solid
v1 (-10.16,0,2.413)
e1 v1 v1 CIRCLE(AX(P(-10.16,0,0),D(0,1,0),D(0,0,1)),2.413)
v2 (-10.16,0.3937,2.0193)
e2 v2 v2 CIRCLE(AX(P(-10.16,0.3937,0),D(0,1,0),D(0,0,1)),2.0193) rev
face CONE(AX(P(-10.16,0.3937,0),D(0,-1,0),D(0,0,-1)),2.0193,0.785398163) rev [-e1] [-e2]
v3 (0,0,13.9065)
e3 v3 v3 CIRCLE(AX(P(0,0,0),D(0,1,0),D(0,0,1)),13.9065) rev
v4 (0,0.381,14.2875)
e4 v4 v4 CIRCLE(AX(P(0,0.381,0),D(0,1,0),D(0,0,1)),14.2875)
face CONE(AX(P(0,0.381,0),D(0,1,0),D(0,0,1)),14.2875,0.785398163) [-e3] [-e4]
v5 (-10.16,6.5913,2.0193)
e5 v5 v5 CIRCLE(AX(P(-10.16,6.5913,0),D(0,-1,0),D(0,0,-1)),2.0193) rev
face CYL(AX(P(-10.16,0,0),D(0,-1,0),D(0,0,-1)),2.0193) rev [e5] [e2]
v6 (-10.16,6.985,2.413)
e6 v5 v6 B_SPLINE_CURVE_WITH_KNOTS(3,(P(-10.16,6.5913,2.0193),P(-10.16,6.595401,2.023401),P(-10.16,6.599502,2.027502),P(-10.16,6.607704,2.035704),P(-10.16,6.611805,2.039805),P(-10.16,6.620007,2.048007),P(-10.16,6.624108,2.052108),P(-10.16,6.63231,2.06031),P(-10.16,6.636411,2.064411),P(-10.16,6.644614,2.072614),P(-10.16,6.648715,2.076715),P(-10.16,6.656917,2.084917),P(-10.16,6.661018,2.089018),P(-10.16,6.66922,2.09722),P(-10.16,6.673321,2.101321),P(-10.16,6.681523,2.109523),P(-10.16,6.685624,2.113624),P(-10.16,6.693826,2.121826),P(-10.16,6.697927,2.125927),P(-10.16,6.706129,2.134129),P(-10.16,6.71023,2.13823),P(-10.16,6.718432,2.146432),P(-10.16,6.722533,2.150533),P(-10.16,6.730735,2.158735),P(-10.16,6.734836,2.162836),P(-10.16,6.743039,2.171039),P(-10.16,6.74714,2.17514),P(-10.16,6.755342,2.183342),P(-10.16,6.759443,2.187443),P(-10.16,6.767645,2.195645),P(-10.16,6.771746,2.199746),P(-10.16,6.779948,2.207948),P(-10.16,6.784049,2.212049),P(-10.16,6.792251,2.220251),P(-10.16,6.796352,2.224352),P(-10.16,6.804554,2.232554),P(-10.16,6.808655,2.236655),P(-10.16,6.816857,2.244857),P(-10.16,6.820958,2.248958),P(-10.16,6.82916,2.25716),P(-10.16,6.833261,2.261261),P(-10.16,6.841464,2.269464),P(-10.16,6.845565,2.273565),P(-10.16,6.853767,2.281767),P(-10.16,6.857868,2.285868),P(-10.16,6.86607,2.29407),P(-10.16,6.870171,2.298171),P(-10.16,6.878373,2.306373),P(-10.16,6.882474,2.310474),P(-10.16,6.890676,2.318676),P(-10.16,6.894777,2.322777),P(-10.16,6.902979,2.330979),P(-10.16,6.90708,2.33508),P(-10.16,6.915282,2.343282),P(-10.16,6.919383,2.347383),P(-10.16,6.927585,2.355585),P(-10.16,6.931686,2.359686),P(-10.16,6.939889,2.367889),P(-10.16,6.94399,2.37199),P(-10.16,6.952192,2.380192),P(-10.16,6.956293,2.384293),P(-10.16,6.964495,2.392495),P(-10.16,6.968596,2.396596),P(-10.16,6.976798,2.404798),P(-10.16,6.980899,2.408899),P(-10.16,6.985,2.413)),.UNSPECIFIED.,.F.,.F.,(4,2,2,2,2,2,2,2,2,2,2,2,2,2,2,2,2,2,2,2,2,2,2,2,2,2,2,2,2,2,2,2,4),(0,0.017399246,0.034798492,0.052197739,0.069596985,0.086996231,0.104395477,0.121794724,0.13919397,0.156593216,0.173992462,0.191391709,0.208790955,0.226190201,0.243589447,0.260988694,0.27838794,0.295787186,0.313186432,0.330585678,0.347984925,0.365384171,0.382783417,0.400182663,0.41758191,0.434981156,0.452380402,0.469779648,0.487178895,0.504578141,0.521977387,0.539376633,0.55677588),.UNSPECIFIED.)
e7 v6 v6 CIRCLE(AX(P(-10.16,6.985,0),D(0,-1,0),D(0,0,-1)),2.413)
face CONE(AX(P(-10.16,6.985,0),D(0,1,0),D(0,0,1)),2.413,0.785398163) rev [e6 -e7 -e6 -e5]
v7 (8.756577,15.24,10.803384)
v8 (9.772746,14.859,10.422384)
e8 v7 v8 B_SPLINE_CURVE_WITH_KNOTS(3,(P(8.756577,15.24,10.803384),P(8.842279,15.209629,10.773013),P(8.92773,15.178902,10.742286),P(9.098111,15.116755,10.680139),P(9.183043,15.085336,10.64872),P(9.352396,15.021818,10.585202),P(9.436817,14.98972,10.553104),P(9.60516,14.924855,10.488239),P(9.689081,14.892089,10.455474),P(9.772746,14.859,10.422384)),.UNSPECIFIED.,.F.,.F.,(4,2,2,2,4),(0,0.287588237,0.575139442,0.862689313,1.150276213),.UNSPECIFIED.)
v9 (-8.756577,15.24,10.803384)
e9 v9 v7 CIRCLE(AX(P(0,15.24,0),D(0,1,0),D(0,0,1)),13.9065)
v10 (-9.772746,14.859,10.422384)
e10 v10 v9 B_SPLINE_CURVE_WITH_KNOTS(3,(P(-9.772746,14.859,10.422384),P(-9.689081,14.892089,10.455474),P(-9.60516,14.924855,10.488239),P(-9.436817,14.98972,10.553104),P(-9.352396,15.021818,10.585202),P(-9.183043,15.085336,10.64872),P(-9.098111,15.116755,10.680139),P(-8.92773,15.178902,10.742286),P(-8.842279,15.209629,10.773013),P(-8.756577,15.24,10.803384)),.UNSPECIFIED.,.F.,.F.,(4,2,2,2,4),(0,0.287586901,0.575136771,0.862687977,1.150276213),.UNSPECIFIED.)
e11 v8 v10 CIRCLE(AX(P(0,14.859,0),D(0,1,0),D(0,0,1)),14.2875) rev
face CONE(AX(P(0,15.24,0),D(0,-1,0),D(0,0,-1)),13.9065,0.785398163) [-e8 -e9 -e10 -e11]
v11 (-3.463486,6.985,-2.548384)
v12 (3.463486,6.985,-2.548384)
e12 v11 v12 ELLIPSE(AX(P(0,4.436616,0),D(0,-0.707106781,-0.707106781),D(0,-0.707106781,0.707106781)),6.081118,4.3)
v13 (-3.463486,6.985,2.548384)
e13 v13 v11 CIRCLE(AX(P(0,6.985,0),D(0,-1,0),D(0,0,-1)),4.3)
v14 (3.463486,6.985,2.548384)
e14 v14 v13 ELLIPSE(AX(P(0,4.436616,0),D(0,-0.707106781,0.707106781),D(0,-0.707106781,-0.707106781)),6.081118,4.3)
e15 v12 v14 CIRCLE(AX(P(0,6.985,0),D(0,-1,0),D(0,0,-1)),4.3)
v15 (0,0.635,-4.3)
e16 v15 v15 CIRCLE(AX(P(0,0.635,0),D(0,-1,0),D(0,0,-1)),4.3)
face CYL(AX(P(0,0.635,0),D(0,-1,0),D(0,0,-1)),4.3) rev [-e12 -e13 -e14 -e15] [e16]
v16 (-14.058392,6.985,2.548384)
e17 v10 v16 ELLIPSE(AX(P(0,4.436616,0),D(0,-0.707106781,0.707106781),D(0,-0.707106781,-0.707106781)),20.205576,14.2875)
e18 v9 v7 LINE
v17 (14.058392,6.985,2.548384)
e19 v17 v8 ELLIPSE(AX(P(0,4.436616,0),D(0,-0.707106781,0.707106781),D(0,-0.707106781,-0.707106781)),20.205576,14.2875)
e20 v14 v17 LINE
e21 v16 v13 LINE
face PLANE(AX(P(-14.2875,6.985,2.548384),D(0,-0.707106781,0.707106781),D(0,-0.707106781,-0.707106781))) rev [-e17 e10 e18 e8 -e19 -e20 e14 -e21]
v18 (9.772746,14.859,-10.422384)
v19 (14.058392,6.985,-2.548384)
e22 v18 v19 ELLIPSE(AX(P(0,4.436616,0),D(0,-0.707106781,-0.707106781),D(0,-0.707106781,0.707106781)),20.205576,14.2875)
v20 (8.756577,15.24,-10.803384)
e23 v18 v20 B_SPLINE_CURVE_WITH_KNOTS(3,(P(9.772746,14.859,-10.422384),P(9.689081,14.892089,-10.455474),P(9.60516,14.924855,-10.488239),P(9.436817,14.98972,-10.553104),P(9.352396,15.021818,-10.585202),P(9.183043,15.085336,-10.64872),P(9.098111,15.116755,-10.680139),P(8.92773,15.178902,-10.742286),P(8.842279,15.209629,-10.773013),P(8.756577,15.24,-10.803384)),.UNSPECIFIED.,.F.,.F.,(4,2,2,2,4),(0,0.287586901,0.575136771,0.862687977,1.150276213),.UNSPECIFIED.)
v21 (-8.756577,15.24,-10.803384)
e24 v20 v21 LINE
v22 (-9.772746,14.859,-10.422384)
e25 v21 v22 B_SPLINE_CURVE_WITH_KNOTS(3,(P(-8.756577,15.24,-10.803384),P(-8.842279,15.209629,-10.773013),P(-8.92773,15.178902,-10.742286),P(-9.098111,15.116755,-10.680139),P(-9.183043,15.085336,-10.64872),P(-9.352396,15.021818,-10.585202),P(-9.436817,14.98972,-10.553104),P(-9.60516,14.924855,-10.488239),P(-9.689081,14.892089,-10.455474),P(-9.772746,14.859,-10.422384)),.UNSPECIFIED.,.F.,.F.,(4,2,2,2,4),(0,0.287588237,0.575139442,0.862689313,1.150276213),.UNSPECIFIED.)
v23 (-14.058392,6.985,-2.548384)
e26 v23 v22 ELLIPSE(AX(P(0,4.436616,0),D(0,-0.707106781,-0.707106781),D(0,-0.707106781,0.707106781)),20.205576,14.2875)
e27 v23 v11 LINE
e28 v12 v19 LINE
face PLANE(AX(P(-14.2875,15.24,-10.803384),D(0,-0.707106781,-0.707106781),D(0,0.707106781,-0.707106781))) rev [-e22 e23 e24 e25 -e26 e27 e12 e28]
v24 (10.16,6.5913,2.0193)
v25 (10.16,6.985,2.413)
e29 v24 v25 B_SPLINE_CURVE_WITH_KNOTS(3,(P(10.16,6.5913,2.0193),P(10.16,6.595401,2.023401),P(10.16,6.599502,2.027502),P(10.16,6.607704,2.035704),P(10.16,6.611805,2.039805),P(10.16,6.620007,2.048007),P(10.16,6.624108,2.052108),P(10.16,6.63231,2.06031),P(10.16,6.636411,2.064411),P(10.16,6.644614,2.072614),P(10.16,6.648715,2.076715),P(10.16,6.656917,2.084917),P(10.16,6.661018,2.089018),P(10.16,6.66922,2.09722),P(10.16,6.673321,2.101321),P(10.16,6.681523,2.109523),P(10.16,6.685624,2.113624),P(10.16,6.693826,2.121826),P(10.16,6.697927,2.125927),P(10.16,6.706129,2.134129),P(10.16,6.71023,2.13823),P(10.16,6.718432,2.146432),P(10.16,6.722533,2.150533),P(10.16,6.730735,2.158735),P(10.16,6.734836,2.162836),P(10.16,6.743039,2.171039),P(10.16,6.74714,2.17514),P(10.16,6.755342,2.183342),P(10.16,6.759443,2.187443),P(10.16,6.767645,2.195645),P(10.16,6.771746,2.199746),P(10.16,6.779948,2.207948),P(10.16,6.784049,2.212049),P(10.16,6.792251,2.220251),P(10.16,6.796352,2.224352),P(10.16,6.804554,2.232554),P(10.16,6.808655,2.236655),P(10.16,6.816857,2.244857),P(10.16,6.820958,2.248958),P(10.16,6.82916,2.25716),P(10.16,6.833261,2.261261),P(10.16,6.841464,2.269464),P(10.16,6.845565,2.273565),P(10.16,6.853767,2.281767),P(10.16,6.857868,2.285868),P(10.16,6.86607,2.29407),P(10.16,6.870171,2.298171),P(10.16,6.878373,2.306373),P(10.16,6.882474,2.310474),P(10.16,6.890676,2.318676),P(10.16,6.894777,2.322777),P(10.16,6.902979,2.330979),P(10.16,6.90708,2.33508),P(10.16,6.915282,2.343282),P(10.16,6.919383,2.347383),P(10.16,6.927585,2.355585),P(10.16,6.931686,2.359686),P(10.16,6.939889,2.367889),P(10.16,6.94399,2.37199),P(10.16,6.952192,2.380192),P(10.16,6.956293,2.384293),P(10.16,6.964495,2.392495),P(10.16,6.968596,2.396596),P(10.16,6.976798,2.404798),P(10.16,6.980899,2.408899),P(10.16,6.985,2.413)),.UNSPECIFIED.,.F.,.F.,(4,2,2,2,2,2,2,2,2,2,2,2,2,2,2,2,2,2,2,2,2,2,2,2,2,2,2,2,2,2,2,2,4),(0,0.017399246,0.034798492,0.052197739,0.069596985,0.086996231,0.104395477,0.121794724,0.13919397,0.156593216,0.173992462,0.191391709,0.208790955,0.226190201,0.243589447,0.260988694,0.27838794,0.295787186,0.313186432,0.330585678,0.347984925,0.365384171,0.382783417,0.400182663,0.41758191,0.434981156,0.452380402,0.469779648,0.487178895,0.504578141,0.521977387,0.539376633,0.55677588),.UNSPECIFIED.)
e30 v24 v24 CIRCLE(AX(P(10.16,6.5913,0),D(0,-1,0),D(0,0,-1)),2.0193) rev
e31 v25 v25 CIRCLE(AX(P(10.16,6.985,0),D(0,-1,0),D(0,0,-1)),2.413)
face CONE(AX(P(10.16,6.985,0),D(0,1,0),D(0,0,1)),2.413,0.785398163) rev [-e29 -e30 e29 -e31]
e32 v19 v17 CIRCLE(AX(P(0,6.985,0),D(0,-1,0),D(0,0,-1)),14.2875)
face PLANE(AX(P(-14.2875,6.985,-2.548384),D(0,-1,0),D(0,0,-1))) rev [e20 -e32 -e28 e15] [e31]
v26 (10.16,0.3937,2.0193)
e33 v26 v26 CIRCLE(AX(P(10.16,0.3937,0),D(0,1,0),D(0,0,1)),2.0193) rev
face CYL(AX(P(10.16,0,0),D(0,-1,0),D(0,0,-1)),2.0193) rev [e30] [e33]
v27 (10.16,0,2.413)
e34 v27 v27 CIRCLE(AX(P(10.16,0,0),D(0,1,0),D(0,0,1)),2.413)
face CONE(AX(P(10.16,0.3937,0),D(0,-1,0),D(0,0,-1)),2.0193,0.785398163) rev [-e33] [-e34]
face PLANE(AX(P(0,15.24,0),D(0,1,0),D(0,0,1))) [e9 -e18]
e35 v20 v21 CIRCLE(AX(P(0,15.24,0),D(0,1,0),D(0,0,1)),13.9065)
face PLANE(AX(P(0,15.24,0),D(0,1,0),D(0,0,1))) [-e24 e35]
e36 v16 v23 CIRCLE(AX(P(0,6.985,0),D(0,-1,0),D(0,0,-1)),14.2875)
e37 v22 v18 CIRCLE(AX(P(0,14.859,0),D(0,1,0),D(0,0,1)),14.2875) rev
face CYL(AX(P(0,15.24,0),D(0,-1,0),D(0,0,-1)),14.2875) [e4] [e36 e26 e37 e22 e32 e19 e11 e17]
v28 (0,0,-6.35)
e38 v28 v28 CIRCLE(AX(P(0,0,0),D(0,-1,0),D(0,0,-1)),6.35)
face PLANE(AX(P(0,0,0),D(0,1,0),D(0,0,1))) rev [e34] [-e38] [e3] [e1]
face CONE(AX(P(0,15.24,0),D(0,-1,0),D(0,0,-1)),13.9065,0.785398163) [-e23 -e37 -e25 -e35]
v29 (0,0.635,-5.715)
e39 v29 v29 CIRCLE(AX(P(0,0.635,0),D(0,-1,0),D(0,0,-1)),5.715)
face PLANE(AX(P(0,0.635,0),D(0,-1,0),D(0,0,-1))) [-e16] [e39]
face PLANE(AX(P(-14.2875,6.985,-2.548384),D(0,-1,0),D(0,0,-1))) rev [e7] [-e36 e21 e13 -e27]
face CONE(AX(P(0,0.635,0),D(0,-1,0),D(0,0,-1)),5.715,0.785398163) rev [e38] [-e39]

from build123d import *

# Parameters (mm, degrees)
SKETCH1_R                      = 14.2875
EXTRUDE1_DEPTH                 = 15.24
CUT_EXTRUDE1_DEPTH             = 26.308554137
CUT_EXTRUDE1_DEPTH_BACK        = 26.308554137
TAP_DRILL_FOR_10_TAP1_D        = 4.0386
CHAMFER1_SIZE                  = 0.3937
SKETCH6_R                      = 6.35
CUT_EXTRUDE2_DEPTH             = 0.635
CHAMFER2_SIZE                  = 0.635
CHAMFER3_SIZE                  = 0.381
F_8_6_8_6_DIAMETER_HOLE1_D     = 8.6
F_8_6_8_6_DIAMETER_HOLE1_DEPTH = 15.24
F_8_6_8_6_DIAMETER_HOLE1_TIP   = 2.583700662


with BuildPart() as part:
    # Sketch1 → Extrude1 (new body)
    with BuildSketch(Plane(origin=(0, 0, 0), x_dir=(1, 0, 0), z_dir=(0, 1, 0))):
        with Locations(Location((0, 0, 0), (0, 0, 90))):
            Circle(SKETCH1_R)
    extrude(amount=EXTRUDE1_DEPTH)

    # Sketch3 → Cut-Extrude1 (cut, two sides: drawn at the far end of the back side and taken through both)
    with BuildSketch(Plane(origin=(0, 0, 0), x_dir=(0, 0, -1), z_dir=(1, 0, 0)).offset(-CUT_EXTRUDE1_DEPTH_BACK)):
        Polygon((-10.803384182, 15.24), (10.803384182, 15.24), (2.548384182, 6.985), (-2.548384182, 6.985), align=None)
    extrude(amount=CUT_EXTRUDE1_DEPTH + CUT_EXTRUDE1_DEPTH_BACK, mode=Mode.SUBTRACT)

    # Tap Drill for #10 Tap1 (through all)
    with Locations(Plane.XZ):
        with Locations((-10.16, 0), (10.16, 0)):
            Hole(TAP_DRILL_FOR_10_TAP1_D / 2)

    # Chamfer1
    chamfer1_edges = [part.edges().sort_by_distance(p)[0] for p in [
        (12.1793, 6.985, 0),
        (12.1793, 0, 0),
        (-8.1407, 6.985, 0),
        (-8.1407, 0, 0),
    ]]
    chamfer(chamfer1_edges, length=CHAMFER1_SIZE)

    # Sketch6 → Cut-Extrude2 (cut)
    with BuildSketch(Plane.XZ):
        with Locations(Location((0, 0, 0), (0, 0, 270))):
            Circle(SKETCH6_R)
    extrude(amount=-CUT_EXTRUDE2_DEPTH, mode=Mode.SUBTRACT)

    # Chamfer2
    chamfer2_edges = [part.edges().sort_by_distance(p)[0] for p in [
        (0, 0.635, 6.35),
    ]]
    chamfer(chamfer2_edges, length=CHAMFER2_SIZE - 0.0001)  # a hair under: the kernel refuses the full size

    # Sketch9 → Cut-Revolve1 (revolve, cut)
    with BuildSketch(Plane.XY, mode=Mode.PRIVATE) as cut_revolve1_sk:
        Polygon((2.032, 6.985), (1.5875, 6.5405), (1.5875, 0.9525), (1.905, 0.635), (0, 0.635), (0, 6.985), align=None)
    revolve(cut_revolve1_sk.sketch.rotate(Axis((0, 0, 0), (0, 1, 0)), 90), axis=Axis((0, 0, 0), (0, 1, 0)), mode=Mode.SUBTRACT)

    # Chamfer3
    chamfer3_edges = [part.edges().sort_by_distance(p)[0] for p in [
        (0, 0, 14.2875),
        (4.988953034, 15.24, -13.388166561),
        (0, 15.24, 14.2875),
    ]]
    chamfer(chamfer3_edges, length=CHAMFER3_SIZE)

    # Ø8.6 (8.6) Diameter Hole1
    with Locations(Plane.XZ.offset(-0.635)):
        with Locations((0, 0)):
            Hole(F_8_6_8_6_DIAMETER_HOLE1_D / 2, depth=F_8_6_8_6_DIAMETER_HOLE1_DEPTH)
            with Locations((0, 0, -(F_8_6_8_6_DIAMETER_HOLE1_DEPTH + F_8_6_8_6_DIAMETER_HOLE1_TIP / 2))):  # 118° drill point
                Cone(0, F_8_6_8_6_DIAMETER_HOLE1_D / 2, F_8_6_8_6_DIAMETER_HOLE1_TIP, mode=Mode.SUBTRACT)


solid = part.part
